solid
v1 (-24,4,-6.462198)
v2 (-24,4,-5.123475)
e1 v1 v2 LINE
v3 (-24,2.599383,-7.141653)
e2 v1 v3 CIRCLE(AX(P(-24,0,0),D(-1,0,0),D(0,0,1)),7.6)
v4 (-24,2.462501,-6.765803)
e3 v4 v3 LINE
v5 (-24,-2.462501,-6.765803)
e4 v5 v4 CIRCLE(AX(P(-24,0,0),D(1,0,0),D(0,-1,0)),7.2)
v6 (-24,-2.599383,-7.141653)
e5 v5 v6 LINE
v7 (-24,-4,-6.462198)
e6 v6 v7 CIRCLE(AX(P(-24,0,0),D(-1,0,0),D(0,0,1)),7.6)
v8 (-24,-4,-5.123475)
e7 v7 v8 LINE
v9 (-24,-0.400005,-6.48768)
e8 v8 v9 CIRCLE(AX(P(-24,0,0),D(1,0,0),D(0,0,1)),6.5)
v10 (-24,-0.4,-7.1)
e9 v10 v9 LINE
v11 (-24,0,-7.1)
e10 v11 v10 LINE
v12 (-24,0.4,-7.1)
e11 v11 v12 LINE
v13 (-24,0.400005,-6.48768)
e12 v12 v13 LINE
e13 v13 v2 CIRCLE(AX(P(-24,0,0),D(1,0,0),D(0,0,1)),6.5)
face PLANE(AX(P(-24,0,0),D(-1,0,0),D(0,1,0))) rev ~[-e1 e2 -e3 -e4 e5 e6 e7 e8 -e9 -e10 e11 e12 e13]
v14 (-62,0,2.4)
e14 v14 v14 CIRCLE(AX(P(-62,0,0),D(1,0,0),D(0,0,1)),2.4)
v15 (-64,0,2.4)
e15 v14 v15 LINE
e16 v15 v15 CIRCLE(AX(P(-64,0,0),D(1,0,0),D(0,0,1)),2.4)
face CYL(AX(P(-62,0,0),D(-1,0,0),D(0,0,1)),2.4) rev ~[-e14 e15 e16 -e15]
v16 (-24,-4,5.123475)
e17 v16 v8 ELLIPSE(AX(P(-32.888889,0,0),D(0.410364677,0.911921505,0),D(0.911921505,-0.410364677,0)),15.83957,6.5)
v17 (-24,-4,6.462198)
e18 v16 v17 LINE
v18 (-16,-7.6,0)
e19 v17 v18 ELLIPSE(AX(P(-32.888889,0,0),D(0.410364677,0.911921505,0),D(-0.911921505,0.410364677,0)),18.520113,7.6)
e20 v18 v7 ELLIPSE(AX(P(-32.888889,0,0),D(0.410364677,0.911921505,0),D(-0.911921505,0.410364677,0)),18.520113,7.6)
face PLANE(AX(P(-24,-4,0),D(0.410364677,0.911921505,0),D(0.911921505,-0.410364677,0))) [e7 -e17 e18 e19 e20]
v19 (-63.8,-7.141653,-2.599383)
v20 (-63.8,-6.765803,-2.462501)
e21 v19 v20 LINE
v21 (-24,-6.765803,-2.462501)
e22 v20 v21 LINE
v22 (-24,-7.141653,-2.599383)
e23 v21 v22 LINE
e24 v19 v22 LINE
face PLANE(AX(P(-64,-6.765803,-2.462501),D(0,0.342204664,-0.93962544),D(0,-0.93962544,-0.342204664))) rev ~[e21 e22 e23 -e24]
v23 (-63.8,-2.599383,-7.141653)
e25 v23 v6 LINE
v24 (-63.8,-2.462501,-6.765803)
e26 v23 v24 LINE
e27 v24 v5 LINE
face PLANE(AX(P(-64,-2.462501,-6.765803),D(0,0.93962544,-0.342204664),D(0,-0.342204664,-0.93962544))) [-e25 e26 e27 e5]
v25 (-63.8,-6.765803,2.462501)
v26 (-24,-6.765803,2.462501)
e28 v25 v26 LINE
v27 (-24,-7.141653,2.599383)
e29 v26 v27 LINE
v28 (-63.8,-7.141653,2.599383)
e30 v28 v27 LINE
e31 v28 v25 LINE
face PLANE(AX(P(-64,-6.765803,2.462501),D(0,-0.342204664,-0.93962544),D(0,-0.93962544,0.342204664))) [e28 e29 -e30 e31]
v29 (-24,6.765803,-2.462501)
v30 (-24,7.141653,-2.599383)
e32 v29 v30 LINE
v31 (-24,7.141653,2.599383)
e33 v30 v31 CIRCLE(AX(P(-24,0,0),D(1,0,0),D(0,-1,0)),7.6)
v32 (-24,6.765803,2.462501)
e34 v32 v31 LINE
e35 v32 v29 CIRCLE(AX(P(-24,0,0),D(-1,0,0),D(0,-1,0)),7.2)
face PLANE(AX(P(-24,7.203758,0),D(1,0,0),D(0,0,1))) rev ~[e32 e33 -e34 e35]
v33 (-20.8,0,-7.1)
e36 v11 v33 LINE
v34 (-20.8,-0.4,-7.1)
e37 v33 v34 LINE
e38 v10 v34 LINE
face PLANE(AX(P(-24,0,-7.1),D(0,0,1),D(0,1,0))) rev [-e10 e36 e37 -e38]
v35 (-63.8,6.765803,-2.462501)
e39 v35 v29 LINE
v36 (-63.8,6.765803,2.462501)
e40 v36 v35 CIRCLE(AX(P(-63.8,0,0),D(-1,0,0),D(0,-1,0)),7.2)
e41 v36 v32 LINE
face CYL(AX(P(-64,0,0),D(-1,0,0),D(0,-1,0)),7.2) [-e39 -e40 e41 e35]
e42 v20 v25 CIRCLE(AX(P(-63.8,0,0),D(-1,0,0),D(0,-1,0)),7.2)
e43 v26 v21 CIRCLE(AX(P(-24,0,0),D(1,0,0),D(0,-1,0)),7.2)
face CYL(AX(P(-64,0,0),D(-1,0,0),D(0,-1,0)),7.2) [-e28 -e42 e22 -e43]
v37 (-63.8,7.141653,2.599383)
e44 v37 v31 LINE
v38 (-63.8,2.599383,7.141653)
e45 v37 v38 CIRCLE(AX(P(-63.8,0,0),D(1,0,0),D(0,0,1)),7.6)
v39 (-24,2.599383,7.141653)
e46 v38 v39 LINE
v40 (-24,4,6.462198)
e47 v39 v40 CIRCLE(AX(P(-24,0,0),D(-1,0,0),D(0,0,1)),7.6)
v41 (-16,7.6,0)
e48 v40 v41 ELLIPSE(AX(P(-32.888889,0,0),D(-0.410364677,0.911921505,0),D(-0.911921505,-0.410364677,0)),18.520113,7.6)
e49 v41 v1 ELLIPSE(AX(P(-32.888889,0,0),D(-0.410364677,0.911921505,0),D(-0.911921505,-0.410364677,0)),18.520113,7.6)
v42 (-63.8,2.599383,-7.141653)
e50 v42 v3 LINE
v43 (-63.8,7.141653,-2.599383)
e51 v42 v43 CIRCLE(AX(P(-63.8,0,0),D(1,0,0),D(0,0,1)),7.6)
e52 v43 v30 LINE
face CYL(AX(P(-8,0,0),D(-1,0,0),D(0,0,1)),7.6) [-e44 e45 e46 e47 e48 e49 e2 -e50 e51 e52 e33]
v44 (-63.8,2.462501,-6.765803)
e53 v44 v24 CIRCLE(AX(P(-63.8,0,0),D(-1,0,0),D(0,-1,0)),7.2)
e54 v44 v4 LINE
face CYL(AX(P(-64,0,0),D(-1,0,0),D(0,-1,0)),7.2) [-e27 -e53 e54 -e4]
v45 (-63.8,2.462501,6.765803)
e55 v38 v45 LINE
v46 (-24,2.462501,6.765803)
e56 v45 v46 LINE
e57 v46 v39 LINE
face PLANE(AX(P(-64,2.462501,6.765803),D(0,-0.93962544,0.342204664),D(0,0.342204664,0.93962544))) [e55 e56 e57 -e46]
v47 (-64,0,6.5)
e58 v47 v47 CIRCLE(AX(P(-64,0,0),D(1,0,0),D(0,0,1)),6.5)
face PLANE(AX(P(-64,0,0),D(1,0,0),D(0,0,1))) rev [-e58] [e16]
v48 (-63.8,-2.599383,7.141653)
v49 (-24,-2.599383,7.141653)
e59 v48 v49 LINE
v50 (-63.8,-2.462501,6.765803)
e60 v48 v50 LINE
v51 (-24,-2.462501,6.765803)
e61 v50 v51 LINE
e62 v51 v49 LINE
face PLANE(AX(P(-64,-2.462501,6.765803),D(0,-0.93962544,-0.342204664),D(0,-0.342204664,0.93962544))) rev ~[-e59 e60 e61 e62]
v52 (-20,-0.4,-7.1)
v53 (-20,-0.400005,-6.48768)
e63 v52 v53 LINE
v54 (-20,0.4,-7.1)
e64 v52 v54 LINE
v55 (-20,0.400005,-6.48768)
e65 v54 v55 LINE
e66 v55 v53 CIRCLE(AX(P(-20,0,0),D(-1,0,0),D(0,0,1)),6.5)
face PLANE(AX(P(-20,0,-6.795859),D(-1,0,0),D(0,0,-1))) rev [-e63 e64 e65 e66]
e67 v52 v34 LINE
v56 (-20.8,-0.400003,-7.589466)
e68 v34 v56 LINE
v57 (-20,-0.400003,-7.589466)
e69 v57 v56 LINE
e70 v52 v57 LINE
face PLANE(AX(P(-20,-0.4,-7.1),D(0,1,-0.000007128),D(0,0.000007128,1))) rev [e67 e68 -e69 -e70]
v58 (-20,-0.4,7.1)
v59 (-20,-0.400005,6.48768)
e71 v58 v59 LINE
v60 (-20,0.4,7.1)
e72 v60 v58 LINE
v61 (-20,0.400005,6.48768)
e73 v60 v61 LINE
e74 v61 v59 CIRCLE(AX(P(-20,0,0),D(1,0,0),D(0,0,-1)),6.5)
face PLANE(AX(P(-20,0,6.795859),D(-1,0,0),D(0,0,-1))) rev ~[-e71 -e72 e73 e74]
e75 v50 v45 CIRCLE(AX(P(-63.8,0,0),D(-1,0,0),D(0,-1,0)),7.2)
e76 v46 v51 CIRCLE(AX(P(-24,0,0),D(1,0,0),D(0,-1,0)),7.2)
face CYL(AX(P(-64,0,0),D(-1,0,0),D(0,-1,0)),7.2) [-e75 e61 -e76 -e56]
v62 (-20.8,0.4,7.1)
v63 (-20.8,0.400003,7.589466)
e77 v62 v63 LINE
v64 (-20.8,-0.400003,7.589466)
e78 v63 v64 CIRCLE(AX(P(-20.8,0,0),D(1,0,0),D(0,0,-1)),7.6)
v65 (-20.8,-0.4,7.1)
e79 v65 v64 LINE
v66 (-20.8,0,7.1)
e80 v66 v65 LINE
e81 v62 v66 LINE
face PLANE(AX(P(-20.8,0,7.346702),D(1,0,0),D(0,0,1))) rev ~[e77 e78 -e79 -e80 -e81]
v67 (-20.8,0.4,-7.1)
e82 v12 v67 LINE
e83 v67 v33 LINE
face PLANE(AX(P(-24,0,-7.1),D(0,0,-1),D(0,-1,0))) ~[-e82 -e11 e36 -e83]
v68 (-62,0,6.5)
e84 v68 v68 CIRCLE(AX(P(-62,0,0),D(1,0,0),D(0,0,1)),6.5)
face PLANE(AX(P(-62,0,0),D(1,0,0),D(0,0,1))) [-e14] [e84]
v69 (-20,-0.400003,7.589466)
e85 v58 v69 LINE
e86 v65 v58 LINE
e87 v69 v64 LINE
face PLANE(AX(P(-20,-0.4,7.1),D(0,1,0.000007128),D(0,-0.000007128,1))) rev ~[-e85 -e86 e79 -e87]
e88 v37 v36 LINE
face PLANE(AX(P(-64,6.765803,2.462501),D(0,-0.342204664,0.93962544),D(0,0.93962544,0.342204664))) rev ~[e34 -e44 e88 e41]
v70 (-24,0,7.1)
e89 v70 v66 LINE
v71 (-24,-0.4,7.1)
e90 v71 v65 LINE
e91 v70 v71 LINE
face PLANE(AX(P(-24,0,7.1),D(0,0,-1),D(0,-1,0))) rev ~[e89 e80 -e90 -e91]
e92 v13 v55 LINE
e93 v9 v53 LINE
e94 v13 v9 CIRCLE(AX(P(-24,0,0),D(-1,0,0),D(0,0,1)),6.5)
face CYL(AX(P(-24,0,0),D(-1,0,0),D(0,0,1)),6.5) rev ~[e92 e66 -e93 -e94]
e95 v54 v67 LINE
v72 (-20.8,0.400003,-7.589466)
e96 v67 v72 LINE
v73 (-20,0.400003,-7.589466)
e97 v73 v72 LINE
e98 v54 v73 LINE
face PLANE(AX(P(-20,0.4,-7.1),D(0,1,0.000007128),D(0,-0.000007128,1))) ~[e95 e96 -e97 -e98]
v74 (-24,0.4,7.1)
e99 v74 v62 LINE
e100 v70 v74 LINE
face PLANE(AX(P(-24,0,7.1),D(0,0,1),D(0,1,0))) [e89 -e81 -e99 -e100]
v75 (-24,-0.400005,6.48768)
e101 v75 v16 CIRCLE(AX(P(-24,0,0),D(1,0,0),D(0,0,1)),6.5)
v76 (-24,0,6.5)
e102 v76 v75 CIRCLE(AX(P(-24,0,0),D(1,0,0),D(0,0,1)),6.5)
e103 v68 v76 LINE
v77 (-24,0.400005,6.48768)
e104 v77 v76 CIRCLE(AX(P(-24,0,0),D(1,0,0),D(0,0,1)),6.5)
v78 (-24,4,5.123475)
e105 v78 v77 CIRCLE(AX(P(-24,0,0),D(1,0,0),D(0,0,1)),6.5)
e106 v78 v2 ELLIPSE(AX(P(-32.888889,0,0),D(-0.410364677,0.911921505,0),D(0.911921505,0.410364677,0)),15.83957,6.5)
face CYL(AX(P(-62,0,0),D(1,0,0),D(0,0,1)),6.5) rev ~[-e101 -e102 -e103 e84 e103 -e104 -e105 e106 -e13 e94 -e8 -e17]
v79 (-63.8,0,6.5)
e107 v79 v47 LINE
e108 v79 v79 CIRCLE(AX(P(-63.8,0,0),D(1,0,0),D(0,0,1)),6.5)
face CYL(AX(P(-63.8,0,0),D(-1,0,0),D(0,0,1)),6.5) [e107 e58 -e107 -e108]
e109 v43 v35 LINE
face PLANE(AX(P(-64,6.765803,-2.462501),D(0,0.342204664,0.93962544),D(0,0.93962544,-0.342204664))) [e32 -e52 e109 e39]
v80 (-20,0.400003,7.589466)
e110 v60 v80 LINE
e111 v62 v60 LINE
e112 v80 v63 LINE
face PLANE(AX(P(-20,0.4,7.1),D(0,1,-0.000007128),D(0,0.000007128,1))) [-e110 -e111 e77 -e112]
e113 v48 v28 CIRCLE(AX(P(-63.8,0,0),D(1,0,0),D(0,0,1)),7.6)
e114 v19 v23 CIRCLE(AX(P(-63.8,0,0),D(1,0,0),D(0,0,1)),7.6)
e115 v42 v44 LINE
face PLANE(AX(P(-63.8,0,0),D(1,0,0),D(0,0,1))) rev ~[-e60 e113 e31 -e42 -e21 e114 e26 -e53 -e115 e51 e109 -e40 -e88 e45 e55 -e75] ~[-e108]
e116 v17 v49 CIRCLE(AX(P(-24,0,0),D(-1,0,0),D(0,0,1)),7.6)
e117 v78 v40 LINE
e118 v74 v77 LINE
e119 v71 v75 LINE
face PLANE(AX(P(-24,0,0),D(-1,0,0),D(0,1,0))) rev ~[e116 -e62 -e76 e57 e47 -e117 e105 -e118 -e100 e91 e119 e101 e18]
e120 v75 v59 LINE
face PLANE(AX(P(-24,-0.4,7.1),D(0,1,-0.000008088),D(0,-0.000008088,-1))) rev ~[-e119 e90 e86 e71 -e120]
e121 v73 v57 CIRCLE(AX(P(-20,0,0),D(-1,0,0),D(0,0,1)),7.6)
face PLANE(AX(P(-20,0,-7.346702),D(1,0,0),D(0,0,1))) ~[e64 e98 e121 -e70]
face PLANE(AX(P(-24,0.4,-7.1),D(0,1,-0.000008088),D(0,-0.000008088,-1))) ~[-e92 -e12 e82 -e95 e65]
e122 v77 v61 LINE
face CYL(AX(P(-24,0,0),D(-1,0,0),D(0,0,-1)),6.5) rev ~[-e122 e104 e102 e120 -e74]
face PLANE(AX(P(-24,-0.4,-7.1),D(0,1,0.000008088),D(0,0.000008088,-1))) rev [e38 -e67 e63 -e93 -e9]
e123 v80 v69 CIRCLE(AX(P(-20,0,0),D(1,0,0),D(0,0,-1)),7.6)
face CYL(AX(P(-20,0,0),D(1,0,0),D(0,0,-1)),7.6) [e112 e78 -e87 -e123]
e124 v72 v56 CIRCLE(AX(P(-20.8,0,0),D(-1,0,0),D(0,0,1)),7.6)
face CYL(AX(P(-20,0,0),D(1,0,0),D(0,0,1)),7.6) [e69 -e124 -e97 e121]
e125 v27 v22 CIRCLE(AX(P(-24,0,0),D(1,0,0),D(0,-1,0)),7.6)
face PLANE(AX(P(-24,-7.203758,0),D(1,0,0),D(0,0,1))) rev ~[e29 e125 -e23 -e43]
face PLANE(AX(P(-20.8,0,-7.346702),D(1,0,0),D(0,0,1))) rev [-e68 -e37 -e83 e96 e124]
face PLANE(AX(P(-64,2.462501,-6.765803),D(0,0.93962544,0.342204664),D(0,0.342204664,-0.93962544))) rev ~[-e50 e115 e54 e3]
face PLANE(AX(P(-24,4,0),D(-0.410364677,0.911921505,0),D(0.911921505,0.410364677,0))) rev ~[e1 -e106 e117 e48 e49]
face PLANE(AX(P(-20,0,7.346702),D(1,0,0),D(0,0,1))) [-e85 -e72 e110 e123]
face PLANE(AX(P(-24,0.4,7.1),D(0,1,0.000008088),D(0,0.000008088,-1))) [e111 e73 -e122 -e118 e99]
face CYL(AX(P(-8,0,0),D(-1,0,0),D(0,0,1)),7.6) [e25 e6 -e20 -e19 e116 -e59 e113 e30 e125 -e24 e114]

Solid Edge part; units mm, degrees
sketch "Sketch1" plane through (0, 0, 0) normal (0, -1, 0) x (1, 0, 0)
  line L0 (-8, 7.6) -> (-63.8, 7.6)
  line L1 (-63.8, 7.6) -> (-63.8, 6.5)
  line L2 (-63.8, 6.5) -> (-64, 6.5)
  line L3 (-64, 2.4) -> (-64, 6.5)
  line L4 (-62, 2.4) -> (-64, 2.4)
  line L5 (-62, 6.5) -> (-62, 2.4)
  line L6 (-62, 6.5) -> (-24, 6.5)
  line L7 (-24, 6.5) -> (-14, 6.5)
  line L8 (-14, 6.5) -> (-14, 3.1)
  line L9 (-14, 3.1) -> (-8, 3.1)
  line L10 (0, 3.1) -> (-8, 3.1)
  line L11 (0, 3.1) -> (0, 6)
  line L12 (0, 6) -> (-8, 6)
  line L13 (-8, 6) -> (-8, 6.5)
  line L14 (-8, 6.5) -> (-8, 7.6)
revolve "RevolvedProtrusion1" add sketch "Sketch1" angle 360 about axis through (-64, 0, 0) along (1, 0, 0)
sketch "Sketch2" plane through (0, 0, 0) normal (0, 0, 1) x (1, 0, 0)
  line L0 (-16, 7.6) -> (-14, 14.7776)
  line L1 (-14, 14.7776) -> (20.3696, 14.7776)
  line L2 (20.3696, 14.7776) -> (20.3696, -22.0232)
  line L3 (20.3696, -22.0232) -> (-14, -21.4955)
  line L4 (-16, -7.6) -> (-14, -21.4955)
  line L5 (-24, -4) -> (-16, -7.6)
  line L6 (-24, 0) -> (-24, -4)
  line L7 (-24, 0) -> (-24, 4)
  line L8 (-24, 4) -> (-16, 7.6)
extrude "ExtrudedCutout_2" cut sketch "Sketch2" along normal mid plane 60
sketch "Sketch3" plane through (-24, 0, 6.3617) normal (1, 0, 0) x (0, 0, -1)
  line L0 (-0.7383, 0) -> (-0.7383, 0.4)
  line L1 (-0.7383, 0.4) -> (-0.1259, 0.4)
  line L2 (-0.7383, -0.4) -> (-0.1259, -0.4)
  line L3 (-0.7383, 0) -> (-0.7383, -0.4)
  arc A0 (-0.1259, 0.4) -> (-0.1259, -0.4) centre (6.3617, 0) ccw
extrude "ExtrudedCutout_3" add sketch "Sketch3" along normal blind 4
sketch "Sketch4" plane through (-20, 0, 6.3617) normal (1, 0, 0) x (0, 0, -1)
  line L0 (-0.7383, 0.4) -> (-1.2277, 0.4)
  line L1 (-0.7383, -0.4) -> (-1.2277, -0.4)
  line L2 (-0.7383, 0.4) -> (-0.7383, -0.4)
  arc A0 (-1.2277, 0.4) -> (-1.2277, -0.4) centre (6.3617, 0) ccw
extrude "ExtrudedProtrusion_3" add sketch "Sketch4" against normal blind 0.8
mirror "Mirror1" about plane through (0, 0, 0) normal (0, 0, 1) of "ExtrudedProtrusion_3", "ExtrudedCutout_3"
sketch "Sketch5" plane through (-64, 0, 0) normal (-1, 0, 0) x (0, -1, 0)
  line L0 (6.7658, 2.4625) -> (7.1417, 2.5994)
  arc A0 (7.1417, 2.5994) -> (7.1417, -2.5994) centre (0, 0) cw
  line L1 (6.7658, -2.4625) -> (7.1417, -2.5994)
  arc A1 (6.7658, 2.4625) -> (6.7658, -2.4625) centre (0, 0) cw
  line L2 (2.4625, -6.7658) -> (2.5994, -7.1417)
  arc A2 (2.5994, -7.1417) -> (-2.5994, -7.1417) centre (0, 0) cw
  line L3 (-2.4625, -6.7658) -> (-2.5994, -7.1417)
  arc A3 (2.4625, -6.7658) -> (-2.4625, -6.7658) centre (0, 0) cw
  line L4 (-6.7658, -2.4625) -> (-7.1417, -2.5994)
  line L5 (-6.7658, 2.4625) -> (-7.1417, 2.5994)
  arc A4 (-6.7658, 2.4625) -> (-6.7658, -2.4625) centre (0, 0) ccw
  arc A5 (-7.1417, -2.5994) -> (-7.1417, 2.5994) centre (0, 0) cw
  line L6 (-2.4625, 6.7658) -> (-2.5994, 7.1417)
  arc A6 (-2.5994, 7.1417) -> (2.5994, 7.1417) centre (0, 0) cw
  line L7 (2.4625, 6.7658) -> (2.5994, 7.1417)
  arc A7 (-2.4625, 6.7658) -> (2.4625, 6.7658) centre (0, 0) cw
extrude "ExtrudedCutout_4" cut sketch "Sketch5" against normal blind 40
